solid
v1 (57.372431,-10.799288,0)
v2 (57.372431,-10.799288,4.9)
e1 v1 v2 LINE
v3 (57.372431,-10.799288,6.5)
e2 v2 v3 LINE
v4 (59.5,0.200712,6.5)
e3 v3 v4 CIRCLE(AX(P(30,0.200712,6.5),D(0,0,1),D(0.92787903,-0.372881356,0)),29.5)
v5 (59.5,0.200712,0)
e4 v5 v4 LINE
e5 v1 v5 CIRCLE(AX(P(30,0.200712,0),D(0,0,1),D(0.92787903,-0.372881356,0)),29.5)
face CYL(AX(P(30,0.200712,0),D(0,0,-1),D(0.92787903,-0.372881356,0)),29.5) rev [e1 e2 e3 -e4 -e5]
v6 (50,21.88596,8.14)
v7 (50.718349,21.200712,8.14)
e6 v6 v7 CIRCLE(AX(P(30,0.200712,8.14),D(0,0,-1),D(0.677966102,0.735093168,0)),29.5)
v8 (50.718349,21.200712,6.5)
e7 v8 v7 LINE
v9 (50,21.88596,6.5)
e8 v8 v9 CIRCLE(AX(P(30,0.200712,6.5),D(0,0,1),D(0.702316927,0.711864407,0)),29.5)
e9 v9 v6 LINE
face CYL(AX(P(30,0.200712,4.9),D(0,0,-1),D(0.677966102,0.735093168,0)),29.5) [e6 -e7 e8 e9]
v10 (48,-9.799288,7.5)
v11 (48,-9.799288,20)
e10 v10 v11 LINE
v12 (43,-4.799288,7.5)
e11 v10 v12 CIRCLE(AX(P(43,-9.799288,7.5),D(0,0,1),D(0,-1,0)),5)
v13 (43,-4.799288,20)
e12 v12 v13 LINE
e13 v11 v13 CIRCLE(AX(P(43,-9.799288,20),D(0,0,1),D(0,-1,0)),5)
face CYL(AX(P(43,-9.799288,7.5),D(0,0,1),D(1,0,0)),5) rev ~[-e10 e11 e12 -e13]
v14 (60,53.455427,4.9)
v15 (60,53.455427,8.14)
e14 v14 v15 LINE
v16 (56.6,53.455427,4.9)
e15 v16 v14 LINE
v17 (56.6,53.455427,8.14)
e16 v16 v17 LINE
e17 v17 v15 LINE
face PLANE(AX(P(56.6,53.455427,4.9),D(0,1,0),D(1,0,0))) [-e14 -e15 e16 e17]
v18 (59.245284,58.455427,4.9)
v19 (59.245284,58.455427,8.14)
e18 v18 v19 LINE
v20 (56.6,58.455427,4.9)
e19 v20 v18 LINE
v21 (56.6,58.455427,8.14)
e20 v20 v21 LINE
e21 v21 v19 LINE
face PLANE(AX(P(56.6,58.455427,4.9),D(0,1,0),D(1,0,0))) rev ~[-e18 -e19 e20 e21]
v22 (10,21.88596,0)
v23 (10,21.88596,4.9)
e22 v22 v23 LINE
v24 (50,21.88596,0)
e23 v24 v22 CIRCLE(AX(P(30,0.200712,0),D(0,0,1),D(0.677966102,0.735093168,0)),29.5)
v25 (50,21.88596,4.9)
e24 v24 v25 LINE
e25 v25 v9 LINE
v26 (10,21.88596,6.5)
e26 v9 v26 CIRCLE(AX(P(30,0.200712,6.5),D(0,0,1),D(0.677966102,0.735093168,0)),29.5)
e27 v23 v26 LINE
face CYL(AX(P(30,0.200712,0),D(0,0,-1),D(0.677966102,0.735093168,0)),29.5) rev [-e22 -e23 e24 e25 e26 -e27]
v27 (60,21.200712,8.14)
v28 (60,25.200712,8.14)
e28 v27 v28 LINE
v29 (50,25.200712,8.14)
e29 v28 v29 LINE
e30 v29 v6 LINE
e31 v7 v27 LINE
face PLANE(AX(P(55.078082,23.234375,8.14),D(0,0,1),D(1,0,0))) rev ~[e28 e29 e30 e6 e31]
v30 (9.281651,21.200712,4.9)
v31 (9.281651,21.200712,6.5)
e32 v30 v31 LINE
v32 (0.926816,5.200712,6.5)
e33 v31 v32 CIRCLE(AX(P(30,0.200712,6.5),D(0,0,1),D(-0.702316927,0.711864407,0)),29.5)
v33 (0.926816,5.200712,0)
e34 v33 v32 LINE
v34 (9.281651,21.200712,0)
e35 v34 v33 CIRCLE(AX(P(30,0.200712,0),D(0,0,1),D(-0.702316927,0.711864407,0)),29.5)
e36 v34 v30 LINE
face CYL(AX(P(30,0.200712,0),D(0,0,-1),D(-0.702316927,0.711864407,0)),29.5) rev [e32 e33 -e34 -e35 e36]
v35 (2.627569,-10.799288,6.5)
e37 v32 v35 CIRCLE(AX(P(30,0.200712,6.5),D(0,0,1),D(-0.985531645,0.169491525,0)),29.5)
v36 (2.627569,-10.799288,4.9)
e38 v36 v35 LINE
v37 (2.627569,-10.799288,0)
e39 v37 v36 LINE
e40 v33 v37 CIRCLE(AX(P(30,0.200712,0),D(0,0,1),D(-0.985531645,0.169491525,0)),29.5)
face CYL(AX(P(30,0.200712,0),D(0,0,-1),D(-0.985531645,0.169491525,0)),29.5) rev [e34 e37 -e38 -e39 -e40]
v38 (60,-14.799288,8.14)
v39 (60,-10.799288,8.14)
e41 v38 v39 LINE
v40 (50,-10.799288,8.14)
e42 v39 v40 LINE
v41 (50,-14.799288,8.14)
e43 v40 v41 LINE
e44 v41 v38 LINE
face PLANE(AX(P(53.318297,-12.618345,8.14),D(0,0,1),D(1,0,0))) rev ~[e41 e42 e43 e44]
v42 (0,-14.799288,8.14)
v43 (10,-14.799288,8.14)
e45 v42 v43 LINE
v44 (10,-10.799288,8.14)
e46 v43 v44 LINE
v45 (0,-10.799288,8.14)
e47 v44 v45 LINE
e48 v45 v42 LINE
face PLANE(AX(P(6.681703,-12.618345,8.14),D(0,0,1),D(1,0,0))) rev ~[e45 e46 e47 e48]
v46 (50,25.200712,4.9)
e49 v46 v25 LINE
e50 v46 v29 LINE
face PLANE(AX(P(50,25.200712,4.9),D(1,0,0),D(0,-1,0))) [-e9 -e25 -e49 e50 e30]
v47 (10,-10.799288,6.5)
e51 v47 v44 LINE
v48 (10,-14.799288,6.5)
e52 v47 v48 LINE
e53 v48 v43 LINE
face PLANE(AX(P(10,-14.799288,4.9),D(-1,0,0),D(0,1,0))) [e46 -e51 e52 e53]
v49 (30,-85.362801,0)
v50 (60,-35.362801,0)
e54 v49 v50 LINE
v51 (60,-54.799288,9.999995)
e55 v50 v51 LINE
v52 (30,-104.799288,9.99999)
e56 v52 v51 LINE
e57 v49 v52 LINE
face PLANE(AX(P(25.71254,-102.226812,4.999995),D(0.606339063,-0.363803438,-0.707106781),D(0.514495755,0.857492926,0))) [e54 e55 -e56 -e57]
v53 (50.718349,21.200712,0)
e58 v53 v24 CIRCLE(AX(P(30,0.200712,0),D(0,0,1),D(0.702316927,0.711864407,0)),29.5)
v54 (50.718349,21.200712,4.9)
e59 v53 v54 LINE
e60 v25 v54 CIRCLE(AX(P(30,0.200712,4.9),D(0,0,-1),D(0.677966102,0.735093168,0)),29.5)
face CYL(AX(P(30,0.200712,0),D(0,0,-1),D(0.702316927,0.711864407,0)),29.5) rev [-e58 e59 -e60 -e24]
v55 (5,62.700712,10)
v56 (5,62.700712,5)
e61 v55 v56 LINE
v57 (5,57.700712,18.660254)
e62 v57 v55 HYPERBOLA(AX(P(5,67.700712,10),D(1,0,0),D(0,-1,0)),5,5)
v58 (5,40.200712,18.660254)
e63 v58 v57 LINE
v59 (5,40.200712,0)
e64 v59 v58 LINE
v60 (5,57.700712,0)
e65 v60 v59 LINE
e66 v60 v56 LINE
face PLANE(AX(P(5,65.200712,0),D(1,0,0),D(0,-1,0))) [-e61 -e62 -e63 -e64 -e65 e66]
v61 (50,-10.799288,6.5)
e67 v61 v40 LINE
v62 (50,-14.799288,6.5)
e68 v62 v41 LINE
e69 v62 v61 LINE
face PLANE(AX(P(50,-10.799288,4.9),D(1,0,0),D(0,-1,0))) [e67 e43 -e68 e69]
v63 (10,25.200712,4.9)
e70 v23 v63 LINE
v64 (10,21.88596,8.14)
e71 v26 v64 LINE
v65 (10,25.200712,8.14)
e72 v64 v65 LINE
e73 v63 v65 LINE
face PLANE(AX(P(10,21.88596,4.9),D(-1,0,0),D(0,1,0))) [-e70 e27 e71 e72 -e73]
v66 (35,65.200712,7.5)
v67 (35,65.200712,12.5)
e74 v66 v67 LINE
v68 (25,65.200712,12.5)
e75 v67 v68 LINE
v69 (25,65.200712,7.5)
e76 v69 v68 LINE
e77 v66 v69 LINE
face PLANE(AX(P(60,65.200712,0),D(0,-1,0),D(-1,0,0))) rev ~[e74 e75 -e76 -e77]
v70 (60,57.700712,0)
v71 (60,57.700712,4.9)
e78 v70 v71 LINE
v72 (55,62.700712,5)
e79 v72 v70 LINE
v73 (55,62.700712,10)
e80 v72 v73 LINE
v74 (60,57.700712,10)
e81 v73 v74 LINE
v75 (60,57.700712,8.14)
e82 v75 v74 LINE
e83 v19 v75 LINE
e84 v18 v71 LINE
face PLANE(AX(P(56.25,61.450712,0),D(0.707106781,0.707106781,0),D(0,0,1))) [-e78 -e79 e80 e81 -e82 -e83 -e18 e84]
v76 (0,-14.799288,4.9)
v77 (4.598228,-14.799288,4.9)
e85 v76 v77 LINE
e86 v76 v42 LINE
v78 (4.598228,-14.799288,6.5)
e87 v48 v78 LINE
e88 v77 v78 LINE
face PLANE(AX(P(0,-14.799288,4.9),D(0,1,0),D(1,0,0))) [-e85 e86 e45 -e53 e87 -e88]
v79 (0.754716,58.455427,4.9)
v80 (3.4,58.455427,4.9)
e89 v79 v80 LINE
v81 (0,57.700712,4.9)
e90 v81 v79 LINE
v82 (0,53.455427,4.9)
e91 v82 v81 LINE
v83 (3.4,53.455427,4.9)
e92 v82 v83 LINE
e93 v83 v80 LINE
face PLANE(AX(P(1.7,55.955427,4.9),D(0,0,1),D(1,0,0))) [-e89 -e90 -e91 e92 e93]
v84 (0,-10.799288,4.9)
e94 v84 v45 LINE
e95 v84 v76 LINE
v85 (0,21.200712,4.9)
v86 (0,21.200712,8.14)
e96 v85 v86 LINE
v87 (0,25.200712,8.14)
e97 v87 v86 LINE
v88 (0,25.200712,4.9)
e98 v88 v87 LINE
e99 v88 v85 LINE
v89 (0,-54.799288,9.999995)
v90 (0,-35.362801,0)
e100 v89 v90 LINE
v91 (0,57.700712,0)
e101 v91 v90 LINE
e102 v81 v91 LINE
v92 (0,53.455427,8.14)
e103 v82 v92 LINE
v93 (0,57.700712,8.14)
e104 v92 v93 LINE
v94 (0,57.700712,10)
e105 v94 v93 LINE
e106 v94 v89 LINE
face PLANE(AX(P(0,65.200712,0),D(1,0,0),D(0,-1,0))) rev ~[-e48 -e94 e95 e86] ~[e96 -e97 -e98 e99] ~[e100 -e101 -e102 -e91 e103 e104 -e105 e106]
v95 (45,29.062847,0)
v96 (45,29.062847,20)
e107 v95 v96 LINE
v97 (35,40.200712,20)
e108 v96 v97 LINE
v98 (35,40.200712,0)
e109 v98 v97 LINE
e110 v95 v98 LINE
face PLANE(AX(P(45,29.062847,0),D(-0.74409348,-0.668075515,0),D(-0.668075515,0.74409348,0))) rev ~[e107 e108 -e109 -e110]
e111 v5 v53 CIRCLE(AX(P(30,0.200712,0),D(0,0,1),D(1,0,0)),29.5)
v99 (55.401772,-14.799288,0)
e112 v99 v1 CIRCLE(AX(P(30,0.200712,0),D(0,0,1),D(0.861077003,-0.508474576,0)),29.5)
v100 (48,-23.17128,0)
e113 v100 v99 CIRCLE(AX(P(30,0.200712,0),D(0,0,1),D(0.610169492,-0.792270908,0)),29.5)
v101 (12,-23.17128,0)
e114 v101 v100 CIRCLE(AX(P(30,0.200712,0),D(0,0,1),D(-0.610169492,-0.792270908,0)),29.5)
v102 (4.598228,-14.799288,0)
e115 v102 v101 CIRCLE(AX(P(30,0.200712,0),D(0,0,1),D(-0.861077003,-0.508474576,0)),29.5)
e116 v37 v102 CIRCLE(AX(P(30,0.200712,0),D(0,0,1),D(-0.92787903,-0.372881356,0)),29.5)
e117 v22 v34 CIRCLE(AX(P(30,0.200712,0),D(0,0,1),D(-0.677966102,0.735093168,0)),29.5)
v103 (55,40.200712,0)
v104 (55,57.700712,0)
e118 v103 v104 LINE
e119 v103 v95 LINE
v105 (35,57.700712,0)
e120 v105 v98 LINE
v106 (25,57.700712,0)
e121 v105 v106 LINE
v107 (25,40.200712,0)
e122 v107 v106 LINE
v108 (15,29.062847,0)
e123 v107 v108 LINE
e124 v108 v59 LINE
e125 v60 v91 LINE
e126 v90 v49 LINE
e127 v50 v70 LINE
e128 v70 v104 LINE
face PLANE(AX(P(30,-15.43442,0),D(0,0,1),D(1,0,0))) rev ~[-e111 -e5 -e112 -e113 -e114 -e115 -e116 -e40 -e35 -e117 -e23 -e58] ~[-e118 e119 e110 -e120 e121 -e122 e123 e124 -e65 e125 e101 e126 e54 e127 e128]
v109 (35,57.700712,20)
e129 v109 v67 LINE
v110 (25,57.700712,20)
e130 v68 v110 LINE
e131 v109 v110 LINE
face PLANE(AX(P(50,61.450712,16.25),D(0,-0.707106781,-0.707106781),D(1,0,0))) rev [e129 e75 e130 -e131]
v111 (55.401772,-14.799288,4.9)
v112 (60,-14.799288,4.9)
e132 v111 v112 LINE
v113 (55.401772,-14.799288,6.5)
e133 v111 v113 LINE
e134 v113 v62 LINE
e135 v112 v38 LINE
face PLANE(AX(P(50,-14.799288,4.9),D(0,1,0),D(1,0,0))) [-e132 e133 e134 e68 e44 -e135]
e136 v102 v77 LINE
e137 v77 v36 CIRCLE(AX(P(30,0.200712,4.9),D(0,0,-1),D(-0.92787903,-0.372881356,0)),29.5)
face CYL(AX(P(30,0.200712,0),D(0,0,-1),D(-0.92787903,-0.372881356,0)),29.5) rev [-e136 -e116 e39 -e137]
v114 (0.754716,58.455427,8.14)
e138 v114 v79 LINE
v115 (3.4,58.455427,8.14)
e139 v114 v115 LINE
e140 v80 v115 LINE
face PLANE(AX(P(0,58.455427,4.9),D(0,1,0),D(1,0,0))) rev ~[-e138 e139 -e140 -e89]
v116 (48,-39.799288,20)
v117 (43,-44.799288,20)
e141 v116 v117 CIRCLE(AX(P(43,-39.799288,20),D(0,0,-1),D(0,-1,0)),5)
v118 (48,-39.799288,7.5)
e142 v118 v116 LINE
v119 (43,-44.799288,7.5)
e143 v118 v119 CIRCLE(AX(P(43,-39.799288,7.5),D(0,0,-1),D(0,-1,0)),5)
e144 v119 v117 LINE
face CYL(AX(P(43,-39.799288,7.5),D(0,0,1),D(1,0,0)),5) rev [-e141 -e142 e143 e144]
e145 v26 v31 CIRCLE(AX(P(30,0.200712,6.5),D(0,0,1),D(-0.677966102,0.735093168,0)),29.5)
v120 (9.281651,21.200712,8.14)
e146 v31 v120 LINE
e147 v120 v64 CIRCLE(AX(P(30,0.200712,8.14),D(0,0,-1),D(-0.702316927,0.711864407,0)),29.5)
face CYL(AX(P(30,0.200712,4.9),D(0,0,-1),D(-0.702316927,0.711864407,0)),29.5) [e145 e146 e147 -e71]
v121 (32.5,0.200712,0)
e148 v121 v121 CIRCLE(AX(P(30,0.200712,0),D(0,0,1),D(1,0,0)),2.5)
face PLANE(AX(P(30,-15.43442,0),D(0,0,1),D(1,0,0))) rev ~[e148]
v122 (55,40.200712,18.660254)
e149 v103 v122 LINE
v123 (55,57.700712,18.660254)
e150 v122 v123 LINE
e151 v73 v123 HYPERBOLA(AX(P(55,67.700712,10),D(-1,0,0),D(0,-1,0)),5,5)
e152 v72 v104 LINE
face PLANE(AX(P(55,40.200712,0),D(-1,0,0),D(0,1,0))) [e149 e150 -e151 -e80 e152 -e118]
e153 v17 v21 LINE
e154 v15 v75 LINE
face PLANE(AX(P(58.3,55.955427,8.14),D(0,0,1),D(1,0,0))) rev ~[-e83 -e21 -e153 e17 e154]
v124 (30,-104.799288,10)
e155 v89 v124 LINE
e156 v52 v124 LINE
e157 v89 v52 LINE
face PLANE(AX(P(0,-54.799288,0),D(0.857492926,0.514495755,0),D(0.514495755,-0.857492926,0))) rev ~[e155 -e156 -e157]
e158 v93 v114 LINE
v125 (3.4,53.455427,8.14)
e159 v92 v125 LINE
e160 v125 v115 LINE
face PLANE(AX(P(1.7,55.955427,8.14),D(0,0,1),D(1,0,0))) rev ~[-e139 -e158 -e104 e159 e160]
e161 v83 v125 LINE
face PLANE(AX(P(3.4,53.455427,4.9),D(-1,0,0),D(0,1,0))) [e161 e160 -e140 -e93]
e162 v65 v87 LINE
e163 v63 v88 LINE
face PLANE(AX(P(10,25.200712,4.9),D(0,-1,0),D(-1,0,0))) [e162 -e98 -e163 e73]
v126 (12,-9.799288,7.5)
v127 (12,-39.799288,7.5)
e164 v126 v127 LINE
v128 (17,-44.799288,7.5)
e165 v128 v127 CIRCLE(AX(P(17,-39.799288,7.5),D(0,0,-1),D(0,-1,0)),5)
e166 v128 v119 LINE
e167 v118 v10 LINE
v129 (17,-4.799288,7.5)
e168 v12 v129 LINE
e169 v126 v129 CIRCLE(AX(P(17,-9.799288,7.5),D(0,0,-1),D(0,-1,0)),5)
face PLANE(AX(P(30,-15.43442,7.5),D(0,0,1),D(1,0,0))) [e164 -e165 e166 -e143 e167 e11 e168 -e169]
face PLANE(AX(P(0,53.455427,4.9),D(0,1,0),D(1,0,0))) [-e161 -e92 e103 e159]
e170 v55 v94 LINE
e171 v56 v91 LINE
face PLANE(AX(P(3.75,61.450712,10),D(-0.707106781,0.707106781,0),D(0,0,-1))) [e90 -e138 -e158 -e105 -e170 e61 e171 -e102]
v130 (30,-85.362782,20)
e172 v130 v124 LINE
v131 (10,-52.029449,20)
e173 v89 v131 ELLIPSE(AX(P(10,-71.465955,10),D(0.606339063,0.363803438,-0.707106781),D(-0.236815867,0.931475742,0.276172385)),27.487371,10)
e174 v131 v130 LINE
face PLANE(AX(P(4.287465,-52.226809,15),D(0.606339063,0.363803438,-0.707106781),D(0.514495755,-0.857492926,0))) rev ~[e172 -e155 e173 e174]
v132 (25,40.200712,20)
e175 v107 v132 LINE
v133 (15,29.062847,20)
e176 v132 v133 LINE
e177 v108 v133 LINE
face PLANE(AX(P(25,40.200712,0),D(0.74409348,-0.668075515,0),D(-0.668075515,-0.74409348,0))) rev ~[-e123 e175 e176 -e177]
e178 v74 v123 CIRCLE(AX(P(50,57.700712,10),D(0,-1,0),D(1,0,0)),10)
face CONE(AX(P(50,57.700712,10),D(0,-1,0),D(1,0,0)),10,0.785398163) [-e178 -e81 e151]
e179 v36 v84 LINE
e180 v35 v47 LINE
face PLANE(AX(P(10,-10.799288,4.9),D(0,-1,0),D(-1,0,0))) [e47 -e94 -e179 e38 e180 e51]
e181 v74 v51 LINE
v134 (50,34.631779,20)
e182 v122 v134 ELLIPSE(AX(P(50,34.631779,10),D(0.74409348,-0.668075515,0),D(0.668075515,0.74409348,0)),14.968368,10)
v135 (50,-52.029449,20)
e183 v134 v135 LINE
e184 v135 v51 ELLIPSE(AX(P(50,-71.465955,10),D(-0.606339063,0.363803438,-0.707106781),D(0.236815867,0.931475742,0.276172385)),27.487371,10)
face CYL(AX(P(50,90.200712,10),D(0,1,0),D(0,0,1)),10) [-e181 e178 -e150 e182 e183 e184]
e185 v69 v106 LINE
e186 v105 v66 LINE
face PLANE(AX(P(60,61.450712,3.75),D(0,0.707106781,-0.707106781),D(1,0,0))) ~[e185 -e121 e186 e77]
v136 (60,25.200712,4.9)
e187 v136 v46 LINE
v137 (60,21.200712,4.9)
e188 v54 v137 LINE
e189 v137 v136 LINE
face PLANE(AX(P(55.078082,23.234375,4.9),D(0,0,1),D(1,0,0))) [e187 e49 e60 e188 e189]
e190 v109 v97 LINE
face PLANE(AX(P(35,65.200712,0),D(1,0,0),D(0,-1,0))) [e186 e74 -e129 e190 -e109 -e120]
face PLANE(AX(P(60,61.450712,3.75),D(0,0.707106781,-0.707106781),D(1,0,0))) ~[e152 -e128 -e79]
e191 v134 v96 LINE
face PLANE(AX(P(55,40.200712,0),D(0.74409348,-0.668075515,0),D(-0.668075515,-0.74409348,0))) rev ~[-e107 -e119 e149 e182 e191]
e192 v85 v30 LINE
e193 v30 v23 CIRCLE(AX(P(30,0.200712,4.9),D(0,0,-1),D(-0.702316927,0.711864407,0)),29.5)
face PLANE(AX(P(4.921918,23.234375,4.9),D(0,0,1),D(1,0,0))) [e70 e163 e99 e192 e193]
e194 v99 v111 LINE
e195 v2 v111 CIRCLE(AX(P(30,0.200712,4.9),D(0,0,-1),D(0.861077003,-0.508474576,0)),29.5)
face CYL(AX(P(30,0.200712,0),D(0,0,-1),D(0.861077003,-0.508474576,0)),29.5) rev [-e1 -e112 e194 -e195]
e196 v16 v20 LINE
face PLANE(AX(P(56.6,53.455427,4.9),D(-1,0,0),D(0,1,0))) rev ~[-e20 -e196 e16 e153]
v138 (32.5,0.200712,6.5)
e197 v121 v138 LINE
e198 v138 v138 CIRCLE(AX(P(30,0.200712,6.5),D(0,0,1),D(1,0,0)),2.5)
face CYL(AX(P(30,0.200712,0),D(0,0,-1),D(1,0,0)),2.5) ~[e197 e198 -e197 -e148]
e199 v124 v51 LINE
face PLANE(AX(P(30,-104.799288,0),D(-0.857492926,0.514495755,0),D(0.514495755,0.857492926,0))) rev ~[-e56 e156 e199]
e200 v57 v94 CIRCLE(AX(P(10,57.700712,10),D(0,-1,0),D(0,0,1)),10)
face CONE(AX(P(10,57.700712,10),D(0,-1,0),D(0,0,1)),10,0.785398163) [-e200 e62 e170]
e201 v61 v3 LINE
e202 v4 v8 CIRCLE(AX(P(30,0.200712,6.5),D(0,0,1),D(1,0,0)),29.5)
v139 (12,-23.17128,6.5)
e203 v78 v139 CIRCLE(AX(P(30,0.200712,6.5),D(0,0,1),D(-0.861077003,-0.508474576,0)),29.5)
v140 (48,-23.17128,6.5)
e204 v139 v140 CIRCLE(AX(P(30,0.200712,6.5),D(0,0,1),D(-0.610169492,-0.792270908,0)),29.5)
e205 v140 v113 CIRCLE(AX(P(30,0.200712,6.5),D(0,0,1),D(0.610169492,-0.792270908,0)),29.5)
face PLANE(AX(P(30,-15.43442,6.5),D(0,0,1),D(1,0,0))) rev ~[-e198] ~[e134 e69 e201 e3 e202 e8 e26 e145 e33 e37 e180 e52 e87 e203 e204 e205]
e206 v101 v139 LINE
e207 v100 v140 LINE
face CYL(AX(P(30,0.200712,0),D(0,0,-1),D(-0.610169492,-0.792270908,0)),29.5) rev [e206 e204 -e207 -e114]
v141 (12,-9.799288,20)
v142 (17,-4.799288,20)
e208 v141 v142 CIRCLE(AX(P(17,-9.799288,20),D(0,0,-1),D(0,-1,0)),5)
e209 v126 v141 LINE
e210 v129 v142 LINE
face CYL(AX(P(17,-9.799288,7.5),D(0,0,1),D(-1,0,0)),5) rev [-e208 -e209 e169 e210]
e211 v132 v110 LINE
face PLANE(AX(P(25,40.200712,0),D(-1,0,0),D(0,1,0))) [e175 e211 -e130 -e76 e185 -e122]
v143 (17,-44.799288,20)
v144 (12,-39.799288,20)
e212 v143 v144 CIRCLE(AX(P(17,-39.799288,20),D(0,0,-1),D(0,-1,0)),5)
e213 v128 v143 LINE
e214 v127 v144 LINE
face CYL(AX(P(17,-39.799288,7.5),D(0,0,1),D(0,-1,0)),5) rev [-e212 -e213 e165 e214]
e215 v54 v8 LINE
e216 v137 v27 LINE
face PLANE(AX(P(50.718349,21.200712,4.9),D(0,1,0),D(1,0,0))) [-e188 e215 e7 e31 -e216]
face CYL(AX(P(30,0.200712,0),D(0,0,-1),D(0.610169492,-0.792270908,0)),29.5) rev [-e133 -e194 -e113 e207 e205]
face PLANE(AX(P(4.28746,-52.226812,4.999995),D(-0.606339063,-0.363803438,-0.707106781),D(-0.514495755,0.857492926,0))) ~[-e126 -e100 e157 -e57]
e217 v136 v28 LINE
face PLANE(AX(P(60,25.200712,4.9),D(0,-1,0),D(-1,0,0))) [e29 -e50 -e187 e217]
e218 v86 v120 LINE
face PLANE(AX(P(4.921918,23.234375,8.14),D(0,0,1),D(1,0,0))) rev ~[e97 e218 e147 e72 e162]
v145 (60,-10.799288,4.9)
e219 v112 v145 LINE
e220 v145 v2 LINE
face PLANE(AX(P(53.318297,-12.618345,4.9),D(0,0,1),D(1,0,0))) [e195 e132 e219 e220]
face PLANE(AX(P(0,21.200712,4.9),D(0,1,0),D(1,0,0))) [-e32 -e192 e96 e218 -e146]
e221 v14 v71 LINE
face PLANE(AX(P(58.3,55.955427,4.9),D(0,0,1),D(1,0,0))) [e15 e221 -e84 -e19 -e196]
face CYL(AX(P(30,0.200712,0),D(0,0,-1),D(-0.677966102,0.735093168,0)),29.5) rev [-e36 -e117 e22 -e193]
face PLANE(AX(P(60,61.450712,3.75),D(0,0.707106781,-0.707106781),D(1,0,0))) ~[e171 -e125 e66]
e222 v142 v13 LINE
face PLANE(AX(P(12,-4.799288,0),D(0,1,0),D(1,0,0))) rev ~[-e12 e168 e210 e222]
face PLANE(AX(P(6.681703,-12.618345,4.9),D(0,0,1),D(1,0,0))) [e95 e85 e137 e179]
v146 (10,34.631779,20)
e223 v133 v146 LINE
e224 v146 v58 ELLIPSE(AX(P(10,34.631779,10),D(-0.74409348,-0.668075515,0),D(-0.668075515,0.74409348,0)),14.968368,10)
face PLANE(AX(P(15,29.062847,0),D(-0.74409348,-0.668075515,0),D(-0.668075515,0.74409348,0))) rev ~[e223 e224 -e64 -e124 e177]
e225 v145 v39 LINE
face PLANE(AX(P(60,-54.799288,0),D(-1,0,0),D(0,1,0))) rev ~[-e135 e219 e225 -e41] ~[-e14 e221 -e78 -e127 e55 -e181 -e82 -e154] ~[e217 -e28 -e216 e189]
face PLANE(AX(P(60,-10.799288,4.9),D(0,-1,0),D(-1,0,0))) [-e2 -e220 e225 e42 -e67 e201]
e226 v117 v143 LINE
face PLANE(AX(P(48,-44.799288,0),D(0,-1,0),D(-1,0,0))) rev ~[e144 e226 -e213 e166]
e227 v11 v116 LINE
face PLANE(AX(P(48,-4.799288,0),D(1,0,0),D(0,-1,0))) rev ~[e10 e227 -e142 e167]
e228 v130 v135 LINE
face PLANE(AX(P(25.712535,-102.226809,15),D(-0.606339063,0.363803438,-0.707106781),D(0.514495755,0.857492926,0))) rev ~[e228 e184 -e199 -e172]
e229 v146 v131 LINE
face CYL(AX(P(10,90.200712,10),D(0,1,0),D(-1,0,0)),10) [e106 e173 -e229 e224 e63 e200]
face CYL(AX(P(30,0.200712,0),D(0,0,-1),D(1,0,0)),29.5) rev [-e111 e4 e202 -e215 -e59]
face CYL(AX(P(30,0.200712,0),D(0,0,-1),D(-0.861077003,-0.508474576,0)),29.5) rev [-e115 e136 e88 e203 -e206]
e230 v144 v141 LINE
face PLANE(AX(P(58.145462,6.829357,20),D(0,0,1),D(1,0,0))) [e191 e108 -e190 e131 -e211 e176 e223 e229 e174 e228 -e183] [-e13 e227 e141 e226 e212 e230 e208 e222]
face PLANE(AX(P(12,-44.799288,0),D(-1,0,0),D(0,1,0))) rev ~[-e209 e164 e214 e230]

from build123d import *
from build123d import SkipClean  # not in build123d's __all__

# Parameters (mm, degrees)
F0_W        = 2.5
F0_H        = 10
F0_R        = 2.5
F0_W_2      = 3.4
F0_H_2      = 5
F1_DEPTH    = 20
F2_DEPTH    = 7.5
F3_DEPTH    = 6.5
F4_R        = 5
F5_SIZE     = 10
F6_SIZE     = 9.99999
F7_T1_DEPTH = 150.5634936838
F8_SIZE     = 7.5
F9_DEPTH    = 20
F10_START   = 4.9
F10_DEPTH   = 3.24


# Not quite as in the source:
# - a fillet or chamfer that OpenCascade refuses, or shapes differently, is made with other operations: its cross-section is extruded or revolved along the edge and cut away or added
# - a fillet or chamfer is up to 0.001 mm smaller than in the source, because OpenCascade refuses the exact size


with BuildPart() as f1:
    # F0 (on Top) → F1 (new body)
    with BuildSketch(Plane.XY):
        with BuildLine():
            Line((60, 21.2007117721), (50.7183493551, 21.2007117721))
            ThreePointArc((50.7183493551, 21.2007117721), (57.2161836595, 11.5818078095), (59.5, 0.2007117721))
            ThreePointArc((59.5, 0.2007117721), (58.9632243189, -5.4012197743), (57.3724313863, -10.7992882279))
            Line((57.3724313863, -10.7992882279), (60, -10.7992882279))
            Line((60, -10.7992882279), (60, 21.2007117721))
        make_face()
        with BuildLine():
            Line((9.2816506449, 21.2007117721), (0, 21.2007117721))
            Line((0, 21.2007117721), (0, 5.2007117721))
            Line((0, 5.2007117721), (0.9268164798, 5.2007117721))
            ThreePointArc((0.9268164798, 5.2007117721), (3.8504457683, 13.8554110907), (9.2816506449, 21.2007117721))
        make_face()
        with BuildLine():
            Line((2.6275686137, -10.7992882279), (0, -10.7992882279))
            Line((0, -10.7992882279), (0, -14.7992882279))
            Line((0, -14.7992882279), (4.5982284082, -14.7992882279))
            ThreePointArc((4.5982284082, -14.7992882279), (3.5372124485, -12.8365760979), (2.6275686137, -10.7992882279))
        make_face()
        with Locations((46.75, 60.2007117721)):
            Rectangle(F0_W, F0_H)
        with Locations((13.25, 60.2007117721)):
            Rectangle(F0_W, F0_H)
        Polygon((30, -54.7992882279), (30, -104.7992882279), (60, -54.7992882279), (48, -54.7992882279), (43, -54.7992882279), align=None)
        Polygon((12, -54.7992882279), (0, -54.7992882279), (30, -104.7992882279), (30, -54.7992882279), align=None)
        with BuildLine():
            Line((10, 21.2007117721), (9.2816506449, 21.2007117721))
            ThreePointArc((9.2816506449, 21.2007117721), (3.8504457683, 13.8554110907), (0.9268164798, 5.2007117721))
            ThreePointArc((0.9268164798, 5.2007117721), (0.6652618804, -2.9174831312), (2.6275686137, -10.7992882279))
            Line((2.6275686137, -10.7992882279), (10, -10.7992882279))
            Line((10, -10.7992882279), (10, -14.7992882279))
            Line((10, -14.7992882279), (4.5982284082, -14.7992882279))
            ThreePointArc((4.5982284082, -14.7992882279), (7.8990722833, -19.3389656577), (12, -23.1712800129))
            Line((12, -23.1712800129), (12, -4.7992882279))
            Line((12, -4.7992882279), (48, -4.7992882279))
            Line((48, -4.7992882279), (48, -23.1712800129))
            ThreePointArc((48, -23.1712800129), (52.1009277167, -19.3389656577), (55.4017715918, -14.7992882279))
            Line((55.4017715918, -14.7992882279), (50, -14.7992882279))
            Line((50, -14.7992882279), (50, -10.7992882279))
            Line((50, -10.7992882279), (57.3724313863, -10.7992882279))
            ThreePointArc((57.3724313863, -10.7992882279), (58.9632243189, -5.4012197743), (59.5, 0.2007117721))
            ThreePointArc((59.5, 0.2007117721), (57.2161836595, 11.5818078095), (50.7183493551, 21.2007117721))
            Line((50.7183493551, 21.2007117721), (50, 21.2007117721))
            Line((50, 21.2007117721), (50, 21.8859602143))
            ThreePointArc((50, 21.8859602143), (30, 29.7007117721), (10, 21.8859602143))
            Line((10, 21.8859602143), (10, 21.2007117721))
        make_face()
        with Locations((30, 0.2007117721)):
            Circle(F0_R, mode=Mode.SUBTRACT)
        with Locations((30, 0.2007117721)):
            Circle(F0_R)
        Polygon((12, 65.2007117721), (5, 65.2007117721), (5, 40.2007117721), (25, 40.2007117721), (25, 65.2007117721), (14.5, 65.2007117721), (14.5, 55.2007117721), (12, 55.2007117721), align=None)
        Polygon((45.5, 65.2007117721), (35, 65.2007117721), (35, 40.2007117721), (55, 40.2007117721), (55, 65.2007117721), (48, 65.2007117721), (48, 55.2007117721), (45.5, 55.2007117721), align=None)
        Polygon((12, -44.7992882279), (12, -54.7992882279), (30, -54.7992882279), (43, -54.7992882279), (48, -54.7992882279), (48, -44.7992882279), align=None)
        with BuildLine():
            Line((10, 25.2007117721), (0, 25.2007117721))
            Line((0, 25.2007117721), (0, 21.2007117721))
            Line((0, 21.2007117721), (9.2816506449, 21.2007117721))
            ThreePointArc((9.2816506449, 21.2007117721), (9.6379425178, 21.5463580517), (10, 21.8859602143))
            Line((10, 21.8859602143), (10, 25.2007117721))
        make_face()
        with BuildLine():
            Line((4.5982284082, -14.7992882279), (0, -14.7992882279))
            Line((0, -14.7992882279), (0, -49.7992882279))
            Line((0, -49.7992882279), (0, -54.7992882279))
            Line((0, -54.7992882279), (12, -54.7992882279))
            Line((12, -54.7992882279), (12, -44.7992882279))
            Line((12, -44.7992882279), (12, -23.1712800129))
            ThreePointArc((12, -23.1712800129), (7.8990722833, -19.3389656577), (4.5982284082, -14.7992882279))
        make_face()
        with BuildLine():
            Line((10, -10.7992882279), (2.6275686137, -10.7992882279))
            ThreePointArc((2.6275686137, -10.7992882279), (3.5372124485, -12.8365760979), (4.5982284082, -14.7992882279))
            Line((4.5982284082, -14.7992882279), (10, -14.7992882279))
            Line((10, -14.7992882279), (10, -10.7992882279))
        make_face()
        with BuildLine():
            Line((0.9268164798, 5.2007117721), (0, 5.2007117721))
            Line((0, 5.2007117721), (0, -10.7992882279))
            Line((0, -10.7992882279), (2.6275686137, -10.7992882279))
            ThreePointArc((2.6275686137, -10.7992882279), (0.6652618804, -2.9174831312), (0.9268164798, 5.2007117721))
        make_face()
        with BuildLine():
            ThreePointArc((55.4017715918, -14.7992882279), (52.1009277167, -19.3389656577), (48, -23.1712800129))
            Line((48, -23.1712800129), (48, -44.7992882279))
            Line((48, -44.7992882279), (48, -54.7992882279))
            Line((48, -54.7992882279), (60, -54.7992882279))
            Line((60, -54.7992882279), (60, -14.7992882279))
            Line((60, -14.7992882279), (55.4017715918, -14.7992882279))
        make_face()
        with BuildLine():
            Line((5, 65.2007117721), (0, 65.2007117721))
            Line((0, 65.2007117721), (0, 58.455427289))
            Line((0, 58.455427289), (3.4, 58.455427289))
            Line((3.4, 58.455427289), (3.4, 53.455427289))
            Line((3.4, 53.455427289), (0, 53.455427289))
            Line((0, 53.455427289), (0, 25.2007117721))
            Line((0, 25.2007117721), (10, 25.2007117721))
            Line((10, 25.2007117721), (10, 21.8859602143))
            ThreePointArc((10, 21.8859602143), (30, 29.7007117721), (50, 21.8859602143))
            Line((50, 21.8859602143), (50, 25.2007117721))
            Line((50, 25.2007117721), (60, 25.2007117721))
            Line((60, 25.2007117721), (60, 53.455427289))
            Line((60, 53.455427289), (56.6, 53.455427289))
            Line((56.6, 53.455427289), (56.6, 58.455427289))
            Line((56.6, 58.455427289), (60, 58.455427289))
            Line((60, 58.455427289), (60, 65.2007117721))
            Line((60, 65.2007117721), (55, 65.2007117721))
            Line((55, 65.2007117721), (55, 40.2007117721))
            Line((55, 40.2007117721), (45, 29.0628469233))
            Line((45, 29.0628469233), (35, 40.2007117721))
            Line((35, 40.2007117721), (35, 65.2007117721))
            Line((35, 65.2007117721), (30, 65.2007117721))
            Line((30, 65.2007117721), (25, 65.2007117721))
            Line((25, 65.2007117721), (25, 40.2007117721))
            Line((25, 40.2007117721), (15, 29.0628469233))
            Line((15, 29.0628469233), (5, 40.2007117721))
            Line((5, 40.2007117721), (5, 65.2007117721))
        make_face()
        with BuildLine():
            Line((50, 25.2007117721), (50, 21.8859602143))
            ThreePointArc((50, 21.8859602143), (50.3620574822, 21.5463580517), (50.7183493551, 21.2007117721))
            Line((50.7183493551, 21.2007117721), (60, 21.2007117721))
            Line((60, 21.2007117721), (60, 25.2007117721))
            Line((60, 25.2007117721), (50, 25.2007117721))
        make_face()
        with BuildLine():
            Line((60, -10.7992882279), (57.3724313863, -10.7992882279))
            ThreePointArc((57.3724313863, -10.7992882279), (56.4627875515, -12.8365760979), (55.4017715918, -14.7992882279))
            Line((55.4017715918, -14.7992882279), (60, -14.7992882279))
            Line((60, -14.7992882279), (60, -10.7992882279))
        make_face()
        with BuildLine():
            ThreePointArc((55.4017715918, -14.7992882279), (56.4627875515, -12.8365760979), (57.3724313863, -10.7992882279))
            Line((57.3724313863, -10.7992882279), (50, -10.7992882279))
            Line((50, -10.7992882279), (50, -14.7992882279))
            Line((50, -14.7992882279), (55.4017715918, -14.7992882279))
        make_face()
        with BuildLine():
            ThreePointArc((10, 21.8859602143), (9.6379425178, 21.5463580517), (9.2816506449, 21.2007117721))
            Line((9.2816506449, 21.2007117721), (10, 21.2007117721))
            Line((10, 21.2007117721), (10, 21.8859602143))
        make_face()
        with BuildLine():
            ThreePointArc((50.7183493551, 21.2007117721), (50.3620574822, 21.5463580517), (50, 21.8859602143))
            Line((50, 21.8859602143), (50, 21.2007117721))
            Line((50, 21.2007117721), (50.7183493551, 21.2007117721))
        make_face()
        with Locations((1.7, 55.955427289)):
            Rectangle(F0_W_2, F0_H_2)
        with Locations((58.3, 55.955427289)):
            Rectangle(F0_W_2, F0_H_2)
    extrude(amount=F1_DEPTH)

    # F0 (on Top) → F2 (join)
    with BuildSketch(Plane.XY):
        with BuildLine():
            Line((12, -4.7992882279), (12, -23.1712800129))
            ThreePointArc((12, -23.1712800129), (30, -29.2992882279), (48, -23.1712800129))
            Line((48, -23.1712800129), (48, -4.7992882279))
            Line((48, -4.7992882279), (12, -4.7992882279))
        make_face()
        with BuildLine():
            ThreePointArc((48, -23.1712800129), (30, -29.2992882279), (12, -23.1712800129))
            Line((12, -23.1712800129), (12, -44.7992882279))
            Line((12, -44.7992882279), (48, -44.7992882279))
            Line((48, -44.7992882279), (48, -23.1712800129))
        make_face()
    extrude(amount=F2_DEPTH)

    # F0 (on Top) → F3 (cut)
    with BuildSketch(Plane.XY):
        with BuildLine():
            Line((12, -4.7992882279), (12, -23.1712800129))
            ThreePointArc((12, -23.1712800129), (30, -29.2992882279), (48, -23.1712800129))
            Line((48, -23.1712800129), (48, -4.7992882279))
            Line((48, -4.7992882279), (12, -4.7992882279))
        make_face()
        with BuildLine():
            Line((10, 21.2007117721), (9.2816506449, 21.2007117721))
            ThreePointArc((9.2816506449, 21.2007117721), (3.8504457683, 13.8554110907), (0.9268164798, 5.2007117721))
            ThreePointArc((0.9268164798, 5.2007117721), (0.6652618804, -2.9174831312), (2.6275686137, -10.7992882279))
            Line((2.6275686137, -10.7992882279), (10, -10.7992882279))
            Line((10, -10.7992882279), (10, -14.7992882279))
            Line((10, -14.7992882279), (4.5982284082, -14.7992882279))
            ThreePointArc((4.5982284082, -14.7992882279), (7.8990722833, -19.3389656577), (12, -23.1712800129))
            Line((12, -23.1712800129), (12, -4.7992882279))
            Line((12, -4.7992882279), (48, -4.7992882279))
            Line((48, -4.7992882279), (48, -23.1712800129))
            ThreePointArc((48, -23.1712800129), (52.1009277167, -19.3389656577), (55.4017715918, -14.7992882279))
            Line((55.4017715918, -14.7992882279), (50, -14.7992882279))
            Line((50, -14.7992882279), (50, -10.7992882279))
            Line((50, -10.7992882279), (57.3724313863, -10.7992882279))
            ThreePointArc((57.3724313863, -10.7992882279), (58.9632243189, -5.4012197743), (59.5, 0.2007117721))
            ThreePointArc((59.5, 0.2007117721), (57.2161836595, 11.5818078095), (50.7183493551, 21.2007117721))
            Line((50.7183493551, 21.2007117721), (50, 21.2007117721))
            Line((50, 21.2007117721), (50, 21.8859602143))
            ThreePointArc((50, 21.8859602143), (30, 29.7007117721), (10, 21.8859602143))
            Line((10, 21.8859602143), (10, 21.2007117721))
        make_face()
        with Locations((30, 0.2007117721)):
            Circle(F0_R, mode=Mode.SUBTRACT)
        with BuildLine():
            Line((10, -10.7992882279), (2.6275686137, -10.7992882279))
            ThreePointArc((2.6275686137, -10.7992882279), (3.5372124485, -12.8365760979), (4.5982284082, -14.7992882279))
            Line((4.5982284082, -14.7992882279), (10, -14.7992882279))
            Line((10, -14.7992882279), (10, -10.7992882279))
        make_face()
        with BuildLine():
            ThreePointArc((55.4017715918, -14.7992882279), (56.4627875515, -12.8365760979), (57.3724313863, -10.7992882279))
            Line((57.3724313863, -10.7992882279), (50, -10.7992882279))
            Line((50, -10.7992882279), (50, -14.7992882279))
            Line((50, -14.7992882279), (55.4017715918, -14.7992882279))
        make_face()
        with BuildLine():
            ThreePointArc((10, 21.8859602143), (9.6379425178, 21.5463580517), (9.2816506449, 21.2007117721))
            Line((9.2816506449, 21.2007117721), (10, 21.2007117721))
            Line((10, 21.2007117721), (10, 21.8859602143))
        make_face()
        with BuildLine():
            ThreePointArc((50.7183493551, 21.2007117721), (50.3620574822, 21.5463580517), (50, 21.8859602143))
            Line((50, 21.8859602143), (50, 21.2007117721))
            Line((50, 21.2007117721), (50.7183493551, 21.2007117721))
        make_face()
    extrude(amount=F3_DEPTH, mode=Mode.SUBTRACT)

    # F4
    f4_edges = [f1.edges().sort_by_distance(p)[0] for p in [
        (48, -4.799288, 13.75),
        (12, -4.799288, 13.75),
        (12, -44.799288, 13.75),
        (48, -44.799288, 13.75),
    ]]
    fillet(f4_edges, radius=F4_R)

    # F5
    f5_edges = [f1.edges().sort_by_distance(p)[0] for p in [
        (15, -79.799288, 20),
        (45, -79.799288, 20),
    ]]
    chamfer(f5_edges, length=F5_SIZE)

    # F6 (size 10 in the source; OpenCascade refuses exactly that, so slightly less here)
    f6_edges = [f1.edges().sort_by_distance(p)[0] for p in [
        (45, -79.799288, 0),
        (15, -79.799288, 0),
    ]]
    chamfer(f6_edges, length=F6_SIZE)

    # F7: fillet of radius 10 on 2 edges, made by hand

    # F7_s2 → F7_t1 (cut)
    with BuildSketch(Plane.XZ.offset(-90.2007117721)):
        with BuildLine():
            ThreePointArc((50, 20), (57.0710678119, 17.0710678119), (60, 10))
            Line((60, 10), (60, 20))
            Line((60, 20), (50, 20))
        make_face()
        with BuildLine():
            ThreePointArc((0, 10), (2.9289321881, 17.0710678119), (10, 20))
            Line((10, 20), (0, 20))
            Line((0, 20), (0, 10))
        make_face()
    extrude(amount=F7_T1_DEPTH, mode=Mode.SUBTRACT)

    # F8
    f8_edges = [f1.edges().sort_by_distance(p)[0] for p in [
        (30, 65.200712, 20),
        (30, 65.200712, 0),
    ]]
    chamfer(f8_edges, length=F8_SIZE)

    # F0 (on Top) → F9 (cut)
    with BuildSketch(Plane.XY):
        Polygon((12, 65.2007117721), (5, 65.2007117721), (5, 40.2007117721), (25, 40.2007117721), (25, 65.2007117721), (14.5, 65.2007117721), (14.5, 55.2007117721), (12, 55.2007117721), align=None)
        with Locations((13.25, 70.2007117721)):
            Rectangle(F0_W, F0_H)
        with Locations((13.25, 60.2007117721)):
            Rectangle(F0_W, F0_H)
        Polygon((45.5, 65.2007117721), (35, 65.2007117721), (35, 40.2007117721), (55, 40.2007117721), (55, 65.2007117721), (48, 65.2007117721), (48, 55.2007117721), (45.5, 55.2007117721), align=None)
        with Locations((46.75, 60.2007117721)):
            Rectangle(F0_W, F0_H)
        with Locations((46.75, 70.2007117721)):
            Rectangle(F0_W, F0_H)
    with SkipClean():  # cleaning this boolean's faces spoils the solid; the shape is the same uncleaned
        extrude(amount=F9_DEPTH, mode=Mode.SUBTRACT)

    # F0 (on Top) → F10 (cut)
    with BuildSketch(Plane.XY.offset(F10_START)):
        with BuildLine():
            Line((10, 25.2007117721), (0, 25.2007117721))
            Line((0, 25.2007117721), (0, 21.2007117721))
            Line((0, 21.2007117721), (9.2816506449, 21.2007117721))
            ThreePointArc((9.2816506449, 21.2007117721), (9.6379425178, 21.5463580517), (10, 21.8859602143))
            Line((10, 21.8859602143), (10, 25.2007117721))
        make_face()
        with BuildLine():
            Line((50, 25.2007117721), (50, 21.8859602143))
            ThreePointArc((50, 21.8859602143), (50.3620574822, 21.5463580517), (50.7183493551, 21.2007117721))
            Line((50.7183493551, 21.2007117721), (60, 21.2007117721))
            Line((60, 21.2007117721), (60, 25.2007117721))
            Line((60, 25.2007117721), (50, 25.2007117721))
        make_face()
        with BuildLine():
            Line((10, -10.7992882279), (2.6275686137, -10.7992882279))
            ThreePointArc((2.6275686137, -10.7992882279), (3.5372124485, -12.8365760979), (4.5982284082, -14.7992882279))
            Line((4.5982284082, -14.7992882279), (10, -14.7992882279))
            Line((10, -14.7992882279), (10, -10.7992882279))
        make_face()
        with BuildLine():
            Line((2.6275686137, -10.7992882279), (0, -10.7992882279))
            Line((0, -10.7992882279), (0, -14.7992882279))
            Line((0, -14.7992882279), (4.5982284082, -14.7992882279))
            ThreePointArc((4.5982284082, -14.7992882279), (3.5372124485, -12.8365760979), (2.6275686137, -10.7992882279))
        make_face()
        with BuildLine():
            ThreePointArc((55.4017715918, -14.7992882279), (56.4627875515, -12.8365760979), (57.3724313863, -10.7992882279))
            Line((57.3724313863, -10.7992882279), (50, -10.7992882279))
            Line((50, -10.7992882279), (50, -14.7992882279))
            Line((50, -14.7992882279), (55.4017715918, -14.7992882279))
        make_face()
        with BuildLine():
            Line((60, -10.7992882279), (57.3724313863, -10.7992882279))
            ThreePointArc((57.3724313863, -10.7992882279), (56.4627875515, -12.8365760979), (55.4017715918, -14.7992882279))
            Line((55.4017715918, -14.7992882279), (60, -14.7992882279))
            Line((60, -14.7992882279), (60, -10.7992882279))
        make_face()
        with Locations((58.3, 55.955427289)):
            Rectangle(F0_W_2, F0_H_2)
        with Locations((1.7, 55.955427289)):
            Rectangle(F0_W_2, F0_H_2)
    with SkipClean():  # cleaning this boolean's faces spoils the solid; the shape is the same uncleaned
        extrude(amount=F10_DEPTH, mode=Mode.SUBTRACT)


solid = f1.part
